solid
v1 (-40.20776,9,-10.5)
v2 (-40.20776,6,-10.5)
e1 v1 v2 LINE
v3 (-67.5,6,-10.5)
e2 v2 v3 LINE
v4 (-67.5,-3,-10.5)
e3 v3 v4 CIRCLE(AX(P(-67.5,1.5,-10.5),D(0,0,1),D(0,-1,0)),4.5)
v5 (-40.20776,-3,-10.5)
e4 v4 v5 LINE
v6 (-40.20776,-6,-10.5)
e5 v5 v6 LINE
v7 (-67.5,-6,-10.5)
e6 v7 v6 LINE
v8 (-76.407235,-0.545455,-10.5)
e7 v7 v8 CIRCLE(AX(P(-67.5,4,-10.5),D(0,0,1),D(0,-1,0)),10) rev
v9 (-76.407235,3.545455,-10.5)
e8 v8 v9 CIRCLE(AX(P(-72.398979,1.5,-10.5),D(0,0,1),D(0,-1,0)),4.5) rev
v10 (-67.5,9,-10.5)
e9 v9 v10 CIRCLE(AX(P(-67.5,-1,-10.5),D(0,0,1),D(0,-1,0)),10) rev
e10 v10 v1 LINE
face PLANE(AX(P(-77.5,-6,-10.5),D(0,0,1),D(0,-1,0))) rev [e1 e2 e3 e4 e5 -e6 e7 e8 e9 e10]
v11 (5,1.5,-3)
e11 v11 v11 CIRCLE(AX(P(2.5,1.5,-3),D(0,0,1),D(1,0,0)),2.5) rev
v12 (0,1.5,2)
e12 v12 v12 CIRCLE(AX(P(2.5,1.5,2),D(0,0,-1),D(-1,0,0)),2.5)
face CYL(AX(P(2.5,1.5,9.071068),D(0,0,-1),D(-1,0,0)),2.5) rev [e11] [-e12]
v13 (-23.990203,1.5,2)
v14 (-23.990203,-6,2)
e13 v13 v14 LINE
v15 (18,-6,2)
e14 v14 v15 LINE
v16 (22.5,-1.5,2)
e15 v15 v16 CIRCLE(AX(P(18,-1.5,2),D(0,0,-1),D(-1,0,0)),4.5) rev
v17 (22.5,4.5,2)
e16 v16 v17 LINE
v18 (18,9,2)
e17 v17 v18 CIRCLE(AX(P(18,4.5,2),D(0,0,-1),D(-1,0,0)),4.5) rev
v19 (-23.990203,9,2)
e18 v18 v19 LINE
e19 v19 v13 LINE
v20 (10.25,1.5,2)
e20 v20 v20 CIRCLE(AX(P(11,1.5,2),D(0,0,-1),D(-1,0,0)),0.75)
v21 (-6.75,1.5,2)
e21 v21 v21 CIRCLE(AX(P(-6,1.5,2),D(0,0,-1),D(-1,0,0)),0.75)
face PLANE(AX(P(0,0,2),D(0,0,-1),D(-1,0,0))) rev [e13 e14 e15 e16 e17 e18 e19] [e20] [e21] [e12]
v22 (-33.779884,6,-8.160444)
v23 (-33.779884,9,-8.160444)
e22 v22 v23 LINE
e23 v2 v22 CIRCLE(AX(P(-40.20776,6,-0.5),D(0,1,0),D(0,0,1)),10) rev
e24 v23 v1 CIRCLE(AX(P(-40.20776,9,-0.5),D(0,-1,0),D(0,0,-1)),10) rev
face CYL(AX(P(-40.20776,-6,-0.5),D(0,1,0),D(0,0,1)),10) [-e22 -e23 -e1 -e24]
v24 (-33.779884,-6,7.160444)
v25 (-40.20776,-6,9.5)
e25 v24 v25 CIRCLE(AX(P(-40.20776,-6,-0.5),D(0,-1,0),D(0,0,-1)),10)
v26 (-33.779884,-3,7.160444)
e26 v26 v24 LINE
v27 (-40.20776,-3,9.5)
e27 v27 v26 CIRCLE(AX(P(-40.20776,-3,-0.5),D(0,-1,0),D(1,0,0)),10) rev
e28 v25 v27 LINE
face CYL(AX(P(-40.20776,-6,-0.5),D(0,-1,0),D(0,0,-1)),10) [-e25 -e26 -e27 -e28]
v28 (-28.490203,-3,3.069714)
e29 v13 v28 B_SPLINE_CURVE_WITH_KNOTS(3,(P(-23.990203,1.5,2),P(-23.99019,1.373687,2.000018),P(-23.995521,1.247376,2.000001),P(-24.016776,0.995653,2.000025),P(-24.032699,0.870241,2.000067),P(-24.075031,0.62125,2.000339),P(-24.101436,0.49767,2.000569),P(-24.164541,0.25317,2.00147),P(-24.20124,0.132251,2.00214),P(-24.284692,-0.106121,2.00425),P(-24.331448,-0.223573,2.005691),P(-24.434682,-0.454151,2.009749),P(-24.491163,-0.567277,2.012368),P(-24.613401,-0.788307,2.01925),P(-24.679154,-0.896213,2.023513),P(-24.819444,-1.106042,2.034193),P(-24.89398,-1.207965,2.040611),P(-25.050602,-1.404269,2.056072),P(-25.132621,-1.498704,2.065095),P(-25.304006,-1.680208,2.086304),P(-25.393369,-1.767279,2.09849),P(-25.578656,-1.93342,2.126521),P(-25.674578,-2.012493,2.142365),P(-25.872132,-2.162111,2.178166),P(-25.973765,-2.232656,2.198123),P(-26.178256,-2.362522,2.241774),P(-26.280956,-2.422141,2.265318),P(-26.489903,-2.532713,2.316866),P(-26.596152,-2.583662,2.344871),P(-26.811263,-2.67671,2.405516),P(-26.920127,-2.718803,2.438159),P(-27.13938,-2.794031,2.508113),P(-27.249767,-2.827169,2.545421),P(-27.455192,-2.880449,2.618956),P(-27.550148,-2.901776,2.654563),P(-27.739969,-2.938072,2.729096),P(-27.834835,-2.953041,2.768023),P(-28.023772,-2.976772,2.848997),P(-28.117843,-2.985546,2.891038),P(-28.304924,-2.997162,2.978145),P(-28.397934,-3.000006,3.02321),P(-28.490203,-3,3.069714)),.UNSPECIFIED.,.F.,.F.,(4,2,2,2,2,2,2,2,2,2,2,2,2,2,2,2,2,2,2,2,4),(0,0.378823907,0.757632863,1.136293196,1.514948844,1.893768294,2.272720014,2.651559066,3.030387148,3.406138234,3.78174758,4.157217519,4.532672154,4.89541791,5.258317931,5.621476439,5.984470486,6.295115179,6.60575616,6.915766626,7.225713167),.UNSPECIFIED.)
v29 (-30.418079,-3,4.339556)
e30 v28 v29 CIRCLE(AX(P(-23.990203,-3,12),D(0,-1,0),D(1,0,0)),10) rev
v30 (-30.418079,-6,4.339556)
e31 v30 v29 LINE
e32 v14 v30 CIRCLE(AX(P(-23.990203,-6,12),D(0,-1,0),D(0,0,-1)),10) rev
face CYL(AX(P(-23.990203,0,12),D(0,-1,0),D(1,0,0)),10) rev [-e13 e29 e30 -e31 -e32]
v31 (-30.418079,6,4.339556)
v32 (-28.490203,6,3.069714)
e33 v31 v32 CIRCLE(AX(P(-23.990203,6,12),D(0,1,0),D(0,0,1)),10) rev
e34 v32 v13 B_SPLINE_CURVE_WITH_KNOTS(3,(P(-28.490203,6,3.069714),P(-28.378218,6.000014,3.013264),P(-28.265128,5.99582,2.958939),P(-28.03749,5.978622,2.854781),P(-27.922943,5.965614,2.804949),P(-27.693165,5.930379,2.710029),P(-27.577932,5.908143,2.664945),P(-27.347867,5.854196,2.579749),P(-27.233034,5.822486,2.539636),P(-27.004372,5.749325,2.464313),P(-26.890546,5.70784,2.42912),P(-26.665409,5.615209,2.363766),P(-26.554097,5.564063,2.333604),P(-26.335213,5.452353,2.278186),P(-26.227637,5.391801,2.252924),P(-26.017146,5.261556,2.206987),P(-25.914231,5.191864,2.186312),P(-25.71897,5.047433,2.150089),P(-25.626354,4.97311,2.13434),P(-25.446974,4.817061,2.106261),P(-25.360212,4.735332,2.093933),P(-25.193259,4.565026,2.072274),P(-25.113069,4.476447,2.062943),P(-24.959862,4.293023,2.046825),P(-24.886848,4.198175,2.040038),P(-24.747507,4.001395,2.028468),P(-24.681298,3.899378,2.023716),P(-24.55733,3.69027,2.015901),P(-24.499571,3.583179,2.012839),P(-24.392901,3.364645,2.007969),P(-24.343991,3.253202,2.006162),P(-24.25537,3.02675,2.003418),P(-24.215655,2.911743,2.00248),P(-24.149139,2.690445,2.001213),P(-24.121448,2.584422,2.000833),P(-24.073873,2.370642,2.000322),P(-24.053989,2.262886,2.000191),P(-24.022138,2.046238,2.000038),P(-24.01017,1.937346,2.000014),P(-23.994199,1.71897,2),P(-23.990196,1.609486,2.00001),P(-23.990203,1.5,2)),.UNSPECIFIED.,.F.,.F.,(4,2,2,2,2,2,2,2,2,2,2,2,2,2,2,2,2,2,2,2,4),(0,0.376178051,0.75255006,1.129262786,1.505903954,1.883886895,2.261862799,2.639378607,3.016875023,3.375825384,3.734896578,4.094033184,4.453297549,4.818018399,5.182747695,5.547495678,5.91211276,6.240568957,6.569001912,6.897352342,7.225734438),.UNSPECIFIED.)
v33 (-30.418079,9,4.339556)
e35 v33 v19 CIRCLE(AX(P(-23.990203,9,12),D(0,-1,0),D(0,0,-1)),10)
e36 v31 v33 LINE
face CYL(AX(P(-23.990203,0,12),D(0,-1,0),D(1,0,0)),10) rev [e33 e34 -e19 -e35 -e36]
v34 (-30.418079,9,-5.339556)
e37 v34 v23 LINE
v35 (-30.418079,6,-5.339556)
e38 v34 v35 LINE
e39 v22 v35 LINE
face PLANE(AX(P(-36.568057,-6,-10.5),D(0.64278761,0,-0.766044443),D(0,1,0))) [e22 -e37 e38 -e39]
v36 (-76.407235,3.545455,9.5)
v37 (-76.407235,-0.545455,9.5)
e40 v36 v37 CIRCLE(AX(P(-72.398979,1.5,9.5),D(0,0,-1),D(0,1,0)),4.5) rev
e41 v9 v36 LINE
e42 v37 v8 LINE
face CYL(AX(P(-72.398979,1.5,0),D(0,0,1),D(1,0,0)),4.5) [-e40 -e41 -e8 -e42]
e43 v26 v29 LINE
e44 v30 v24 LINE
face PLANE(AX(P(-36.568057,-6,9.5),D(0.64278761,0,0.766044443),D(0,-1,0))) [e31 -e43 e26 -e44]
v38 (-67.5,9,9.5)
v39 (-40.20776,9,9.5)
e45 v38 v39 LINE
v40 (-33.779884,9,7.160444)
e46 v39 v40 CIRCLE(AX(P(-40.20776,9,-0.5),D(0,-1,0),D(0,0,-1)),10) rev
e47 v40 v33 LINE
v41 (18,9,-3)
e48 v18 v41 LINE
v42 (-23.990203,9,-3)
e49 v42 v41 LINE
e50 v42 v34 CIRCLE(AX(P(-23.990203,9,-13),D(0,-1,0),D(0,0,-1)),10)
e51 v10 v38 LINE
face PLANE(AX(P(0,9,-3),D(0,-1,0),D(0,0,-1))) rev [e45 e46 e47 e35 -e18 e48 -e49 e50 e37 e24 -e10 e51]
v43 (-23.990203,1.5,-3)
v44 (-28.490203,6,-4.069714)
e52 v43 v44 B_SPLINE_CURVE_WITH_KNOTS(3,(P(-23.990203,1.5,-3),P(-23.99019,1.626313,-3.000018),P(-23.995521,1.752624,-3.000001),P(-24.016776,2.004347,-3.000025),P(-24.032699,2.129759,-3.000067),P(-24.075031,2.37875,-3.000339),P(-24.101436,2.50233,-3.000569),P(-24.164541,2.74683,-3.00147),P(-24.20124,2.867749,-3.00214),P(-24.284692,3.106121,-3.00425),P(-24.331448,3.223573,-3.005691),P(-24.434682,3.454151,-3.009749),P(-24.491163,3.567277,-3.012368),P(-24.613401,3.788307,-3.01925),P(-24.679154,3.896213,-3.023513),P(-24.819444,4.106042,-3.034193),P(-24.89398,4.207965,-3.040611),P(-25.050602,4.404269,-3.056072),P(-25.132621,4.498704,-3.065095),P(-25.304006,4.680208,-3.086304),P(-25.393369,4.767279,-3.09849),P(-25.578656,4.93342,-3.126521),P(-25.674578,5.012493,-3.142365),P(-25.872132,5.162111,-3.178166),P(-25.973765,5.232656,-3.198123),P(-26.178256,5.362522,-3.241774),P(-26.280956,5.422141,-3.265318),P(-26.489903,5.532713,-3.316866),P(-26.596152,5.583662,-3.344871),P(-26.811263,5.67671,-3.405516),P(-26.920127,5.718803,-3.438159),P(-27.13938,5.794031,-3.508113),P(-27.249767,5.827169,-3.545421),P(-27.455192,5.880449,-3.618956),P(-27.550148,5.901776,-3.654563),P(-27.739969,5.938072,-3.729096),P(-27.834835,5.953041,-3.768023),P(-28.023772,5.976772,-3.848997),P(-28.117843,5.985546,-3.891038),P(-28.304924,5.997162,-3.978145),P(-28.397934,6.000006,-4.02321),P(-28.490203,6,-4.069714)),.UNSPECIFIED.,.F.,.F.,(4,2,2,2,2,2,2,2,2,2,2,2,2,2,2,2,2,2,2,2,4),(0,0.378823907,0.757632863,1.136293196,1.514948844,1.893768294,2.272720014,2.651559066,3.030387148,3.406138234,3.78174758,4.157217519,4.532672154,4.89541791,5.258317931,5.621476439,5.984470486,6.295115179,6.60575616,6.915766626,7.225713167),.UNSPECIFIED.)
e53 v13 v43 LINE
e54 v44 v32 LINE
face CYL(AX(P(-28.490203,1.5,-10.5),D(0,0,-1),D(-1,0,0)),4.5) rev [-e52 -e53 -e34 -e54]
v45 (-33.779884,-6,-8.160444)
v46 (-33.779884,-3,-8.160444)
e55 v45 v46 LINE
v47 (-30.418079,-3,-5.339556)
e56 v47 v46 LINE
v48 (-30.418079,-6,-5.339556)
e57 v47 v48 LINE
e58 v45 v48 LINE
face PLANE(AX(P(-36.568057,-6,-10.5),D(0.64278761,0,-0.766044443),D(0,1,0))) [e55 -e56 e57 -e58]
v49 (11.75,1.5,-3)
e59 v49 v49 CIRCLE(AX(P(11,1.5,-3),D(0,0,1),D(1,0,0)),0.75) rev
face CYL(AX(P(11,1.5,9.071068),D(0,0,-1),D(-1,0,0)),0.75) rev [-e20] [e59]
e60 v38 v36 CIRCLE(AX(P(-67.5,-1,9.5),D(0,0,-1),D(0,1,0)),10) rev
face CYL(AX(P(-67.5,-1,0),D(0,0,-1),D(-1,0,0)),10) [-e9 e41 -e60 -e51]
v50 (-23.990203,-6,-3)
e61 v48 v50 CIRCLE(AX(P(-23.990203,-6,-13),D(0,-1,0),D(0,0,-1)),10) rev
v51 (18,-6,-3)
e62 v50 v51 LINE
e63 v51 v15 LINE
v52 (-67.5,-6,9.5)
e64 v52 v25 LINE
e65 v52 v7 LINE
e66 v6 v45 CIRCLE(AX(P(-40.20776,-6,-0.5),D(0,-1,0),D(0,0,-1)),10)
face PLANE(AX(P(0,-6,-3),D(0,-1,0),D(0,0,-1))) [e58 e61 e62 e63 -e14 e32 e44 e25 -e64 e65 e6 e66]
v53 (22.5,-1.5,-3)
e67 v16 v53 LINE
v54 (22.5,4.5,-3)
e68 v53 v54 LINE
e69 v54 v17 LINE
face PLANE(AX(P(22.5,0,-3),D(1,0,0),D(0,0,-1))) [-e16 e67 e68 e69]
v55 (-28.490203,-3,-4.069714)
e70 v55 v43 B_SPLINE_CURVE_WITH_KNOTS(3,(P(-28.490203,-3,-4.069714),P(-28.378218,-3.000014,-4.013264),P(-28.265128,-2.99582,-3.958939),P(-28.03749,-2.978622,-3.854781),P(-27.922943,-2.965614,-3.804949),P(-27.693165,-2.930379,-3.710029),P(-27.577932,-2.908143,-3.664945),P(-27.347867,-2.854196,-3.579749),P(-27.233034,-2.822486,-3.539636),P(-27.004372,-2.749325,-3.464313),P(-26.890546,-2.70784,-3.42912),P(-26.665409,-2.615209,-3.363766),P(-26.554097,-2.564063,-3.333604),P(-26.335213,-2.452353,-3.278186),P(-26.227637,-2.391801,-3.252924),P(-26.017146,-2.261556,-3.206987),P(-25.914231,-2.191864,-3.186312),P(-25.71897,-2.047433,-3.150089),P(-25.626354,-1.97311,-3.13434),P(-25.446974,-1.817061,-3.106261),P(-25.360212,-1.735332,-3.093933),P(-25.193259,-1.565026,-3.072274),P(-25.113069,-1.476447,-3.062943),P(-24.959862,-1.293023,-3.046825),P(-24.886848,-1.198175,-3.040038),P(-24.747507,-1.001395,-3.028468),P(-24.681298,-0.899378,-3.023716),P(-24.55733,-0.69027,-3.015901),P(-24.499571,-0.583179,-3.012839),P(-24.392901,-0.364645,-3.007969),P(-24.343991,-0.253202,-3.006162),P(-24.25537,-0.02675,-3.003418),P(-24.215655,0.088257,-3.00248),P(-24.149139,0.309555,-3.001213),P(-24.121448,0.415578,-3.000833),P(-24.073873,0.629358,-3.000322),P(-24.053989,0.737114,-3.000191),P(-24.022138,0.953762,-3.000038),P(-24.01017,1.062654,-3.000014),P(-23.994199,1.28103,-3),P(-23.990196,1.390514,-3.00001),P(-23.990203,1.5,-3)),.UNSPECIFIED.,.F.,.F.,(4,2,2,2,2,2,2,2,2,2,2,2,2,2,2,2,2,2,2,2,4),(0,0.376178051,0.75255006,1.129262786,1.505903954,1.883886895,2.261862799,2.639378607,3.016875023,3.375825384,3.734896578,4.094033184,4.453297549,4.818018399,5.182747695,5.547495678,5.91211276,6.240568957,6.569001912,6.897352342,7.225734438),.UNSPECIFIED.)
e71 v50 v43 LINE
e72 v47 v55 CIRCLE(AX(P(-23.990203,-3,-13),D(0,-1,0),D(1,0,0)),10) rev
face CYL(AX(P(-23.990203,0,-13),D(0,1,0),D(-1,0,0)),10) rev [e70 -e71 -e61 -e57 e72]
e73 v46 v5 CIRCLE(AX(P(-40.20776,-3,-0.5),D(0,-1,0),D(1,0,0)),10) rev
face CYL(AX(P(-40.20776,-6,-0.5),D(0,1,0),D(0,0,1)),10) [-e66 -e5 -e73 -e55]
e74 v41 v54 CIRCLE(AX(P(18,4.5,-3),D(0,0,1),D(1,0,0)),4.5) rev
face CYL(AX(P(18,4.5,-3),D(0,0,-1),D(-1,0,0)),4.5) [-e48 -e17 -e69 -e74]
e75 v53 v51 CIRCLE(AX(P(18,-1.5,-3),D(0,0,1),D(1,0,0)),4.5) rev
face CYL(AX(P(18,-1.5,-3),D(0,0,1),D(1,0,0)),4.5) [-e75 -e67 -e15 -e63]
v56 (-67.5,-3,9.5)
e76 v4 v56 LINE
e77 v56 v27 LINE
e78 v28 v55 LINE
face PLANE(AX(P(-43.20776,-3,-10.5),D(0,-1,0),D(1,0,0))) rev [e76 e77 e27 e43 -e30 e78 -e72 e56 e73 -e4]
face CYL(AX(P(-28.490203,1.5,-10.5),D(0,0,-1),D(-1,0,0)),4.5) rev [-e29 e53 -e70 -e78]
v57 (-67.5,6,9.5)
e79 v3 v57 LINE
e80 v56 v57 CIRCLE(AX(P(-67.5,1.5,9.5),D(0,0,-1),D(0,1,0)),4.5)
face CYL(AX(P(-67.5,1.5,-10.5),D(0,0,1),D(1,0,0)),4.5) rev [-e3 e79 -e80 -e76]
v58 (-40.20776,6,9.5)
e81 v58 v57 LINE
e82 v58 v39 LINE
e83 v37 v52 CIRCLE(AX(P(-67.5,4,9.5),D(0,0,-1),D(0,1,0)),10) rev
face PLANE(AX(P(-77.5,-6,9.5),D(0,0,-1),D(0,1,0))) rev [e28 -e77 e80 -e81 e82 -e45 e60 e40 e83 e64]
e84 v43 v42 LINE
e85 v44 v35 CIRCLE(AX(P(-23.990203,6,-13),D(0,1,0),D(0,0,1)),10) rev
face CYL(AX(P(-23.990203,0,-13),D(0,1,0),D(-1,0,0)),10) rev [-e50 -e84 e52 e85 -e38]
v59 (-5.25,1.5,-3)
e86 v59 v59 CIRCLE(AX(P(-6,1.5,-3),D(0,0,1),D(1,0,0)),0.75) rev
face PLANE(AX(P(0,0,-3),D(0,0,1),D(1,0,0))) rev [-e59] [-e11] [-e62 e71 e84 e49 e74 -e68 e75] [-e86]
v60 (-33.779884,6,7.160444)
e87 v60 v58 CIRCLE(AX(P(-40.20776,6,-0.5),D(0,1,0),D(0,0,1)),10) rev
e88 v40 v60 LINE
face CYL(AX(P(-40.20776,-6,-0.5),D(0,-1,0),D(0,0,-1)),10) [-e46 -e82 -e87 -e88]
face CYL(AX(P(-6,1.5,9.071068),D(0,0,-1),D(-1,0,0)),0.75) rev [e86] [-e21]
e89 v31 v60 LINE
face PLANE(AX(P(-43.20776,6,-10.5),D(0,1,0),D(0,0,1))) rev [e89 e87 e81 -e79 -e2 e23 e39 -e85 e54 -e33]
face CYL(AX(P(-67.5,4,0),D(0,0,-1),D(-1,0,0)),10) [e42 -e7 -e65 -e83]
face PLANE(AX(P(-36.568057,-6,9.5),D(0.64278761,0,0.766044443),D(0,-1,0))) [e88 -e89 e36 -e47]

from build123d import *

# Parameters (mm, degrees)
ESBO_O1_W                         = 40
ESBO_O1_H                         = 15
RESSALTO_EXTRUS_O1_DEPTH          = 3
ESBO_O3_W                         = 40
ESBO_O3_H                         = 15
RESSALTO_EXTRUS_O2_DEPTH          = 2
CORTE_EXTRUS_O1_REACH             = 26.418
ESBO_O2_R                         = 2.5
ESBO_O2_R_2                       = 0.75
CORTE_EXTRUS_O1_DIRECTION_2_REACH = 26.418
ESBO_O5_W                         = 20
ESBO_O5_H                         = 15
RESSALTO_EXTRUS_O4_DEPTH          = 60
CHANFRO1_SIZE                     = 19.068057482
CHANFRO1_SIZE_2                   = 16
FILETE4_R                         = 10
CORTE_EXTRUS_O2_DEPTH             = 81.237970309
FILETE5_R                         = 4.5
CIRPATTERN1_COUNT                 = 2
FILLET1_R                         = 4.5


with BuildPart() as part:
    # Esboço1 → Ressalto-extrusão1 (new body)
    with BuildSketch(Plane.XY):
        with Locations((2.5, 1.5)):
            Rectangle(ESBO_O1_W, ESBO_O1_H)
    extrude(amount=-RESSALTO_EXTRUS_O1_DEPTH)

    # Esboço3 → Ressalto-extrusão2 (add)
    with BuildSketch(Plane.XY):
        with Locations((2.5, 1.5)):
            Rectangle(ESBO_O3_W, ESBO_O3_H)
    extrude(amount=RESSALTO_EXTRUS_O2_DEPTH)

    # Corte-extrusão1: up to this face of the body (flat: up to its plane)
    corte_extrus_o1_end = Plane(part.part.faces().sort_by_distance((2.5, 1.5, 2))[0])
    # Esboço2 → Corte-extrusão1 (cut, up to the picked face)
    with BuildSketch(Plane.XY, mode=Mode.PRIVATE) as corte_extrus_o1_sk1:
        with Locations(Location((2.5, 1.5, 0), (0, 0, 180))):
            Circle(ESBO_O2_R)
    corte_extrus_o1_tool1 = split(extrude(corte_extrus_o1_sk1.sketch, amount=CORTE_EXTRUS_O1_REACH, mode=Mode.PRIVATE), bisect_by=corte_extrus_o1_end, keep=Keep.BOTH, mode=Mode.PRIVATE)
    # Esboço2 → Corte-extrusão1 (cut, up to the picked face)
    with BuildSketch(Plane.XY, mode=Mode.PRIVATE) as corte_extrus_o1_sk2:
        with Locations(Location((-6, 1.5, 0), (0, 0, 180))):
            Circle(ESBO_O2_R_2)
    corte_extrus_o1_tool2 = split(extrude(corte_extrus_o1_sk2.sketch, amount=CORTE_EXTRUS_O1_REACH, mode=Mode.PRIVATE), bisect_by=corte_extrus_o1_end, keep=Keep.BOTH, mode=Mode.PRIVATE)
    corte_extrus_o1_1 = corte_extrus_o1_tool1.solids().sort_by(Axis((2.5, 1.5, 0), (0, 0, 1)))[0]
    add(corte_extrus_o1_1, mode=Mode.SUBTRACT)
    corte_extrus_o1_2 = corte_extrus_o1_tool2.solids().sort_by(Axis((-6, 1.5, 0), (0, 0, 1)))[0]
    add(corte_extrus_o1_2, mode=Mode.SUBTRACT)
    corte_extrus_o1 = corte_extrus_o1_1 + corte_extrus_o1_2  # Corte-extrusão1 as one shape, for the pattern or mirror that repeats it

    # Corte-extrusão1 direction 2: up to this face of the body (flat: up to its plane)
    corte_extrus_o1_direction_2_end = Plane(part.part.faces().sort_by_distance((2.5, 1.5, -3))[0])
    # Esboço2 → Corte-extrusão1 direction 2 (cut, up to the picked face)
    with BuildSketch(Plane.XY, mode=Mode.PRIVATE) as corte_extrus_o1_direction_2_sk1:
        with Locations(Location((2.5, 1.5, 0), (0, 0, 180))):
            Circle(ESBO_O2_R)
    corte_extrus_o1_direction_2_tool1 = split(extrude(corte_extrus_o1_direction_2_sk1.sketch, amount=-CORTE_EXTRUS_O1_DIRECTION_2_REACH, mode=Mode.PRIVATE), bisect_by=corte_extrus_o1_direction_2_end, keep=Keep.BOTH, mode=Mode.PRIVATE)
    # Esboço2 → Corte-extrusão1 direction 2 (cut, up to the picked face)
    with BuildSketch(Plane.XY, mode=Mode.PRIVATE) as corte_extrus_o1_direction_2_sk2:
        with Locations(Location((-6, 1.5, 0), (0, 0, 180))):
            Circle(ESBO_O2_R_2)
    corte_extrus_o1_direction_2_tool2 = split(extrude(corte_extrus_o1_direction_2_sk2.sketch, amount=-CORTE_EXTRUS_O1_DIRECTION_2_REACH, mode=Mode.PRIVATE), bisect_by=corte_extrus_o1_direction_2_end, keep=Keep.BOTH, mode=Mode.PRIVATE)
    corte_extrus_o1_direction_2_1 = corte_extrus_o1_direction_2_tool1.solids().sort_by(Axis((2.5, 1.5, 0), (0, 0, -1)))[0]
    add(corte_extrus_o1_direction_2_1, mode=Mode.SUBTRACT)
    corte_extrus_o1_direction_2_2 = corte_extrus_o1_direction_2_tool2.solids().sort_by(Axis((-6, 1.5, 0), (0, 0, -1)))[0]
    add(corte_extrus_o1_direction_2_2, mode=Mode.SUBTRACT)
    corte_extrus_o1_direction_2 = corte_extrus_o1_direction_2_1 + corte_extrus_o1_direction_2_2  # Corte-extrusão1 direction 2 as one shape, for the pattern or mirror that repeats it

    # Esboço5 → Ressalto-extrusão4 (add)
    with BuildSketch(Plane.ZY.offset(17.5)):
        with Locations((-0.5, 1.5)):
            Rectangle(ESBO_O5_W, ESBO_O5_H)
    extrude(amount=RESSALTO_EXTRUS_O4_DEPTH)

    # Chanfro1
    # the kernel refuses this chamfer: 19.068057482, 16 mm, written as the material it takes off along each edge
    with BuildSketch(Plane(origin=(-17.5, -55.146127732, 9.5), x_dir=(-0.9996889667359941, 0, 0.024939322090234247), z_dir=(0, 1, 0))) as chanfro1_piece_1_section:
        Polygon((CHANFRO1_SIZE * 0.99968896671, -CHANFRO1_SIZE * 0.0249393220896), (-CHANFRO1_SIZE_2 * 0.0249393220902, -CHANFRO1_SIZE_2 * 0.999688966736), (0, 0), align=None)
    chanfro1_piece_1 = extrude(amount=113.292255464, mode=Mode.PRIVATE)
    chanfro1_piece_1 = split(chanfro1_piece_1, bisect_by=Plane(origin=(-25.155035178, 1.5, 2), z_dir=(0, 0, 1)), keep=Keep.TOP, mode=Mode.PRIVATE)
    add(chanfro1_piece_1, mode=Mode.SUBTRACT)
    with BuildSketch(Plane(origin=(-17.5, -55.146127732, 9.5), x_dir=(-0.9996889667359941, 0, 0.024939322090234247), z_dir=(0, 1, 0))) as chanfro1_piece_2_section:
        Polygon((CHANFRO1_SIZE * 0.99968896671, -CHANFRO1_SIZE * 0.0249393220896), (-CHANFRO1_SIZE_2 * 0.0249393220902, -CHANFRO1_SIZE_2 * 0.999688966736), (0, 0), align=None)
    chanfro1_piece_2 = extrude(amount=113.292255464, mode=Mode.PRIVATE)
    chanfro1_piece_2 = split(chanfro1_piece_2, bisect_by=Plane(origin=(-18.373305927, 1.5, -3), z_dir=(0, 0, -1)), keep=Keep.TOP, mode=Mode.PRIVATE)
    add(chanfro1_piece_2, mode=Mode.SUBTRACT)
    with BuildSketch(Plane(origin=(-17.5, 58.146127732, -10.5), x_dir=(-0.9996889667359941, 0, -0.02493932209023425), z_dir=(0, -1, 0))) as chanfro1_piece_3_section:
        Polygon((CHANFRO1_SIZE * 0.99968896671, -CHANFRO1_SIZE * 0.0249393220896), (-CHANFRO1_SIZE_2 * 0.0249393220902, -CHANFRO1_SIZE_2 * 0.999688966736), (0, 0), align=None)
    chanfro1_piece_3 = extrude(amount=113.292255464, mode=Mode.PRIVATE)
    chanfro1_piece_3 = split(chanfro1_piece_3, bisect_by=Plane(origin=(-25.155035178, 1.5, -3), z_dir=(0, 0, -1)), keep=Keep.TOP, mode=Mode.PRIVATE)
    add(chanfro1_piece_3, mode=Mode.SUBTRACT)
    with BuildSketch(Plane(origin=(-17.5, 58.146127732, -10.5), x_dir=(-0.9996889667359941, 0, -0.02493932209023425), z_dir=(0, -1, 0))) as chanfro1_piece_4_section:
        Polygon((CHANFRO1_SIZE * 0.99968896671, -CHANFRO1_SIZE * 0.0249393220896), (-CHANFRO1_SIZE_2 * 0.0249393220902, -CHANFRO1_SIZE_2 * 0.999688966736), (0, 0), align=None)
    chanfro1_piece_4 = extrude(amount=113.292255464, mode=Mode.PRIVATE)
    chanfro1_piece_4 = split(chanfro1_piece_4, bisect_by=Plane(origin=(-18.373305927, 1.5, 2), z_dir=(0, 0, 1)), keep=Keep.TOP, mode=Mode.PRIVATE)
    add(chanfro1_piece_4, mode=Mode.SUBTRACT)

    # Filete4
    # the kernel refuses this fillet: 10 mm, written as the material it adds along each edge
    with BuildSketch(Plane(origin=(-27.629905537, -6, 2), x_dir=(1, 0, 0), z_dir=(0, 1, 0)), Plane(origin=(-27.629905537, 9, -3), x_dir=(1, 0, 0), z_dir=(0, -1, 0))) as filete4_piece_1:
        with BuildLine():
            CenterArc((FILETE4_R * 0.363970234266, -FILETE4_R), FILETE4_R, 90, 40)
            Line((-FILETE4_R * 0.27881737542, -FILETE4_R * 0.233955556881), (0, 0))
            Line((0, 0), (FILETE4_R * 0.363970234266, 0))
        make_face()
    extrude(amount=15)
    # the kernel refuses this fillet: 10 mm, written as the material it takes off along each edge
    with BuildSketch(Plane(origin=(-36.568057482, -15.099255857, 9.5), x_dir=(-1, 0, 0), z_dir=(0, 1, 0))) as filete4_2_piece_1:
        with BuildLine():
            CenterArc((FILETE4_R * 0.363970234266, -FILETE4_R), FILETE4_R, 90, 40)
            Line((-FILETE4_R * 0.27881737542, -FILETE4_R * 0.233955556881), (0, 0))
            Line((0, 0), (FILETE4_R * 0.363970234266, 0))
        make_face()
    extrude(amount=33.198511713, mode=Mode.SUBTRACT)
    with BuildSketch(Plane(origin=(-77.5, 9, 34.5), x_dir=(0, -1, 0), z_dir=(0, 0, -1))) as filete4_2_piece_2:
        with BuildLine():
            CenterArc((FILETE4_R, -FILETE4_R), FILETE4_R, 90, 90)
            Line((0, -FILETE4_R), (0, 0))
            Line((0, 0), (FILETE4_R, 0))
        make_face()
    extrude(amount=70, mode=Mode.SUBTRACT)
    with BuildSketch(Plane(origin=(-77.5, -6, -35.5), x_dir=(1, 0, 0), z_dir=(0, 0, 1))) as filete4_2_piece_3:
        with BuildLine():
            CenterArc((FILETE4_R, FILETE4_R), FILETE4_R, 180, 90)
            Line((0, FILETE4_R), (0, 0))
            Line((0, 0), (FILETE4_R, 0))
        make_face()
    extrude(amount=70, mode=Mode.SUBTRACT)
    with BuildSketch(Plane(origin=(-36.568057482, 18.099255857, -10.5), x_dir=(0.7660444431190706, 0, 0.6427876096864291), z_dir=(0, -1, 0))) as filete4_2_piece_4:
        with BuildLine():
            CenterArc((FILETE4_R * 0.363970234266, FILETE4_R), FILETE4_R, 230, 40)
            Line((-FILETE4_R * 0.27881737542, FILETE4_R * 0.233955556881), (0, 0))
            Line((0, 0), (FILETE4_R * 0.363970234266, 0))
        make_face()
    extrude(amount=33.198511713, mode=Mode.SUBTRACT)

    # Esboço6 → Corte-extrusão2 (cut, through all)
    with BuildSketch(Plane.XY.offset(9.5)):
        with BuildLine():
            Line((-43.207759824, 6), (-67.5, 6))
            ThreePointArc((-67.5, 6), (-71.468626967, 4.766281297), (-74.038348415, 1.5))
            ThreePointArc((-74.038348415, 1.5), (-71.468626967, -1.766281297), (-67.5, -3))
            Line((-67.5, -3), (-43.207759824, -3))
            Line((-43.207759824, -3), (-23.990203194, -3))
            Line((-23.990203194, -3), (-23.990203194, 6))
            Line((-23.990203194, 6), (-43.207759824, 6))
        make_face()
    extrude(amount=-CORTE_EXTRUS_O2_DEPTH, mode=Mode.SUBTRACT)

    # Filete5
    # the kernel refuses this fillet: 4.5 mm, written as the material it adds along each edge
    with BuildSketch(Plane(origin=(-23.990203194, 6, 13.25), x_dir=(0, -1, 0), z_dir=(0, 0, -1))) as filete5_piece_1_section:
        with BuildLine():
            CenterArc((FILETE5_R, FILETE5_R), FILETE5_R, 180, 90)
            Line((0, FILETE5_R), (0, 0))
            Line((0, 0), (FILETE5_R, 0))
        make_face()
    filete5_piece_1 = extrude(amount=27.5, mode=Mode.PRIVATE)
    filete5_piece_1 = filete5_piece_1 - Plane(origin=(-23.990203194, 5.729138272, 12), x_dir=(1, 0, 0), z_dir=(0, -1, 0)) * Cylinder(10, 73, mode=Mode.PRIVATE)
    filete5_piece_1 = filete5_piece_1 - Plane(origin=(-23.990203194, 5.729138272, -13), x_dir=(1, 0, 0), z_dir=(0, 1, 0)) * Cylinder(10, 73, mode=Mode.PRIVATE)
    add(filete5_piece_1)
    with BuildSketch(Plane(origin=(-23.990203194, -3, 13.25), x_dir=(-1, 0, 0), z_dir=(0, 0, -1))) as filete5_piece_2_section:
        with BuildLine():
            CenterArc((FILETE5_R, FILETE5_R), FILETE5_R, 180, 90)
            Line((0, FILETE5_R), (0, 0))
            Line((0, 0), (FILETE5_R, 0))
        make_face()
    filete5_piece_2 = extrude(amount=27.5, mode=Mode.PRIVATE)
    filete5_piece_2 = filete5_piece_2 - Plane(origin=(-23.990203194, -2.729138204, 12), x_dir=(1, 0, 0), z_dir=(0, -1, 0)) * Cylinder(10, 73, mode=Mode.PRIVATE)
    filete5_piece_2 = filete5_piece_2 - Plane(origin=(-23.990203194, -2.729138204, -13), x_dir=(1, 0, 0), z_dir=(0, 1, 0)) * Cylinder(10, 73, mode=Mode.PRIVATE)
    add(filete5_piece_2)
    # the kernel refuses this fillet: 4.5 mm, written as the material it takes off along each edge
    with BuildSketch(Plane(origin=(22.5, 9, -14.25), x_dir=(0, -1, 0), z_dir=(0, 0, 1))) as filete5_2_piece_1:
        with BuildLine():
            CenterArc((FILETE5_R, -FILETE5_R), FILETE5_R, 90, 90)
            Line((0, -FILETE5_R), (0, 0))
            Line((0, 0), (FILETE5_R, 0))
        make_face()
    extrude(amount=27.5, mode=Mode.SUBTRACT)
    with BuildSketch(Plane(origin=(22.5, -6, -14.25), x_dir=(0, 1, 0), z_dir=(0, 0, 1))) as filete5_2_piece_2:
        with BuildLine():
            CenterArc((FILETE5_R, FILETE5_R), FILETE5_R, 180, 90)
            Line((0, FILETE5_R), (0, 0))
            Line((0, 0), (FILETE5_R, 0))
        make_face()
    extrude(amount=27.5, mode=Mode.SUBTRACT)

    # CirPattern1: Corte-extrusão1, Corte-extrusão1 direction 2 ×2 about axis
    cirpattern1_axis = Axis((2.5, 1.5, 0), (0, 0, 1))
    add([corte_extrus_o1.rotate(cirpattern1_axis, i * 360 / CIRPATTERN1_COUNT) for i in range(1, CIRPATTERN1_COUNT)], mode=Mode.SUBTRACT)
    add([corte_extrus_o1_direction_2.rotate(cirpattern1_axis, i * 360 / CIRPATTERN1_COUNT) for i in range(1, CIRPATTERN1_COUNT)], mode=Mode.SUBTRACT)

    # Fillet1
    # the kernel refuses this fillet: 4.5 mm, written as the material it adds along each edge
    with BuildSketch(Plane(origin=(-74.038348415, 1.5, 9.5), x_dir=(0.8237540047591835, -0.5669473870150624, 0), z_dir=(0, 0, -1))) as fillet1_piece_1:
        with BuildLine():
            CenterArc((5.385987304, -3.706897218), FILLET1_R, 55.462463337, 179.999811507)
            ThreePointArc((2.834717965, -7.413786043), (0.265006632, -4.147503783), (0, 0))
            ThreePointArc((0, 0), (3.968622224, 1.233715439), (7.937244448, 0))
        make_face()
    extrude(amount=20)
    # the kernel refuses this fillet: 4.5 mm, written as the material it takes off along each edge
    with BuildSketch(Plane(origin=(-77.182458366, 1.5, -15.968577797), x_dir=(0.3543987879296291, -0.9350943797895536, 0), z_dir=(0, 0, 1))) as fillet1_2_piece_1:
        with BuildLine():
            CenterArc((1.695259117, 4.473004216), FILLET1_R, 222.207706223, 54.071383579)
            ThreePointArc((-1.63795498, 1.449813223), (-0.858738838, 0.679985448), (0, 0))
            ThreePointArc((0, 0), (1.093715559, -0.05999063), (2.187431119, 0))
        make_face()
    extrude(amount=30.937155594, mode=Mode.SUBTRACT)


solid = part.part
